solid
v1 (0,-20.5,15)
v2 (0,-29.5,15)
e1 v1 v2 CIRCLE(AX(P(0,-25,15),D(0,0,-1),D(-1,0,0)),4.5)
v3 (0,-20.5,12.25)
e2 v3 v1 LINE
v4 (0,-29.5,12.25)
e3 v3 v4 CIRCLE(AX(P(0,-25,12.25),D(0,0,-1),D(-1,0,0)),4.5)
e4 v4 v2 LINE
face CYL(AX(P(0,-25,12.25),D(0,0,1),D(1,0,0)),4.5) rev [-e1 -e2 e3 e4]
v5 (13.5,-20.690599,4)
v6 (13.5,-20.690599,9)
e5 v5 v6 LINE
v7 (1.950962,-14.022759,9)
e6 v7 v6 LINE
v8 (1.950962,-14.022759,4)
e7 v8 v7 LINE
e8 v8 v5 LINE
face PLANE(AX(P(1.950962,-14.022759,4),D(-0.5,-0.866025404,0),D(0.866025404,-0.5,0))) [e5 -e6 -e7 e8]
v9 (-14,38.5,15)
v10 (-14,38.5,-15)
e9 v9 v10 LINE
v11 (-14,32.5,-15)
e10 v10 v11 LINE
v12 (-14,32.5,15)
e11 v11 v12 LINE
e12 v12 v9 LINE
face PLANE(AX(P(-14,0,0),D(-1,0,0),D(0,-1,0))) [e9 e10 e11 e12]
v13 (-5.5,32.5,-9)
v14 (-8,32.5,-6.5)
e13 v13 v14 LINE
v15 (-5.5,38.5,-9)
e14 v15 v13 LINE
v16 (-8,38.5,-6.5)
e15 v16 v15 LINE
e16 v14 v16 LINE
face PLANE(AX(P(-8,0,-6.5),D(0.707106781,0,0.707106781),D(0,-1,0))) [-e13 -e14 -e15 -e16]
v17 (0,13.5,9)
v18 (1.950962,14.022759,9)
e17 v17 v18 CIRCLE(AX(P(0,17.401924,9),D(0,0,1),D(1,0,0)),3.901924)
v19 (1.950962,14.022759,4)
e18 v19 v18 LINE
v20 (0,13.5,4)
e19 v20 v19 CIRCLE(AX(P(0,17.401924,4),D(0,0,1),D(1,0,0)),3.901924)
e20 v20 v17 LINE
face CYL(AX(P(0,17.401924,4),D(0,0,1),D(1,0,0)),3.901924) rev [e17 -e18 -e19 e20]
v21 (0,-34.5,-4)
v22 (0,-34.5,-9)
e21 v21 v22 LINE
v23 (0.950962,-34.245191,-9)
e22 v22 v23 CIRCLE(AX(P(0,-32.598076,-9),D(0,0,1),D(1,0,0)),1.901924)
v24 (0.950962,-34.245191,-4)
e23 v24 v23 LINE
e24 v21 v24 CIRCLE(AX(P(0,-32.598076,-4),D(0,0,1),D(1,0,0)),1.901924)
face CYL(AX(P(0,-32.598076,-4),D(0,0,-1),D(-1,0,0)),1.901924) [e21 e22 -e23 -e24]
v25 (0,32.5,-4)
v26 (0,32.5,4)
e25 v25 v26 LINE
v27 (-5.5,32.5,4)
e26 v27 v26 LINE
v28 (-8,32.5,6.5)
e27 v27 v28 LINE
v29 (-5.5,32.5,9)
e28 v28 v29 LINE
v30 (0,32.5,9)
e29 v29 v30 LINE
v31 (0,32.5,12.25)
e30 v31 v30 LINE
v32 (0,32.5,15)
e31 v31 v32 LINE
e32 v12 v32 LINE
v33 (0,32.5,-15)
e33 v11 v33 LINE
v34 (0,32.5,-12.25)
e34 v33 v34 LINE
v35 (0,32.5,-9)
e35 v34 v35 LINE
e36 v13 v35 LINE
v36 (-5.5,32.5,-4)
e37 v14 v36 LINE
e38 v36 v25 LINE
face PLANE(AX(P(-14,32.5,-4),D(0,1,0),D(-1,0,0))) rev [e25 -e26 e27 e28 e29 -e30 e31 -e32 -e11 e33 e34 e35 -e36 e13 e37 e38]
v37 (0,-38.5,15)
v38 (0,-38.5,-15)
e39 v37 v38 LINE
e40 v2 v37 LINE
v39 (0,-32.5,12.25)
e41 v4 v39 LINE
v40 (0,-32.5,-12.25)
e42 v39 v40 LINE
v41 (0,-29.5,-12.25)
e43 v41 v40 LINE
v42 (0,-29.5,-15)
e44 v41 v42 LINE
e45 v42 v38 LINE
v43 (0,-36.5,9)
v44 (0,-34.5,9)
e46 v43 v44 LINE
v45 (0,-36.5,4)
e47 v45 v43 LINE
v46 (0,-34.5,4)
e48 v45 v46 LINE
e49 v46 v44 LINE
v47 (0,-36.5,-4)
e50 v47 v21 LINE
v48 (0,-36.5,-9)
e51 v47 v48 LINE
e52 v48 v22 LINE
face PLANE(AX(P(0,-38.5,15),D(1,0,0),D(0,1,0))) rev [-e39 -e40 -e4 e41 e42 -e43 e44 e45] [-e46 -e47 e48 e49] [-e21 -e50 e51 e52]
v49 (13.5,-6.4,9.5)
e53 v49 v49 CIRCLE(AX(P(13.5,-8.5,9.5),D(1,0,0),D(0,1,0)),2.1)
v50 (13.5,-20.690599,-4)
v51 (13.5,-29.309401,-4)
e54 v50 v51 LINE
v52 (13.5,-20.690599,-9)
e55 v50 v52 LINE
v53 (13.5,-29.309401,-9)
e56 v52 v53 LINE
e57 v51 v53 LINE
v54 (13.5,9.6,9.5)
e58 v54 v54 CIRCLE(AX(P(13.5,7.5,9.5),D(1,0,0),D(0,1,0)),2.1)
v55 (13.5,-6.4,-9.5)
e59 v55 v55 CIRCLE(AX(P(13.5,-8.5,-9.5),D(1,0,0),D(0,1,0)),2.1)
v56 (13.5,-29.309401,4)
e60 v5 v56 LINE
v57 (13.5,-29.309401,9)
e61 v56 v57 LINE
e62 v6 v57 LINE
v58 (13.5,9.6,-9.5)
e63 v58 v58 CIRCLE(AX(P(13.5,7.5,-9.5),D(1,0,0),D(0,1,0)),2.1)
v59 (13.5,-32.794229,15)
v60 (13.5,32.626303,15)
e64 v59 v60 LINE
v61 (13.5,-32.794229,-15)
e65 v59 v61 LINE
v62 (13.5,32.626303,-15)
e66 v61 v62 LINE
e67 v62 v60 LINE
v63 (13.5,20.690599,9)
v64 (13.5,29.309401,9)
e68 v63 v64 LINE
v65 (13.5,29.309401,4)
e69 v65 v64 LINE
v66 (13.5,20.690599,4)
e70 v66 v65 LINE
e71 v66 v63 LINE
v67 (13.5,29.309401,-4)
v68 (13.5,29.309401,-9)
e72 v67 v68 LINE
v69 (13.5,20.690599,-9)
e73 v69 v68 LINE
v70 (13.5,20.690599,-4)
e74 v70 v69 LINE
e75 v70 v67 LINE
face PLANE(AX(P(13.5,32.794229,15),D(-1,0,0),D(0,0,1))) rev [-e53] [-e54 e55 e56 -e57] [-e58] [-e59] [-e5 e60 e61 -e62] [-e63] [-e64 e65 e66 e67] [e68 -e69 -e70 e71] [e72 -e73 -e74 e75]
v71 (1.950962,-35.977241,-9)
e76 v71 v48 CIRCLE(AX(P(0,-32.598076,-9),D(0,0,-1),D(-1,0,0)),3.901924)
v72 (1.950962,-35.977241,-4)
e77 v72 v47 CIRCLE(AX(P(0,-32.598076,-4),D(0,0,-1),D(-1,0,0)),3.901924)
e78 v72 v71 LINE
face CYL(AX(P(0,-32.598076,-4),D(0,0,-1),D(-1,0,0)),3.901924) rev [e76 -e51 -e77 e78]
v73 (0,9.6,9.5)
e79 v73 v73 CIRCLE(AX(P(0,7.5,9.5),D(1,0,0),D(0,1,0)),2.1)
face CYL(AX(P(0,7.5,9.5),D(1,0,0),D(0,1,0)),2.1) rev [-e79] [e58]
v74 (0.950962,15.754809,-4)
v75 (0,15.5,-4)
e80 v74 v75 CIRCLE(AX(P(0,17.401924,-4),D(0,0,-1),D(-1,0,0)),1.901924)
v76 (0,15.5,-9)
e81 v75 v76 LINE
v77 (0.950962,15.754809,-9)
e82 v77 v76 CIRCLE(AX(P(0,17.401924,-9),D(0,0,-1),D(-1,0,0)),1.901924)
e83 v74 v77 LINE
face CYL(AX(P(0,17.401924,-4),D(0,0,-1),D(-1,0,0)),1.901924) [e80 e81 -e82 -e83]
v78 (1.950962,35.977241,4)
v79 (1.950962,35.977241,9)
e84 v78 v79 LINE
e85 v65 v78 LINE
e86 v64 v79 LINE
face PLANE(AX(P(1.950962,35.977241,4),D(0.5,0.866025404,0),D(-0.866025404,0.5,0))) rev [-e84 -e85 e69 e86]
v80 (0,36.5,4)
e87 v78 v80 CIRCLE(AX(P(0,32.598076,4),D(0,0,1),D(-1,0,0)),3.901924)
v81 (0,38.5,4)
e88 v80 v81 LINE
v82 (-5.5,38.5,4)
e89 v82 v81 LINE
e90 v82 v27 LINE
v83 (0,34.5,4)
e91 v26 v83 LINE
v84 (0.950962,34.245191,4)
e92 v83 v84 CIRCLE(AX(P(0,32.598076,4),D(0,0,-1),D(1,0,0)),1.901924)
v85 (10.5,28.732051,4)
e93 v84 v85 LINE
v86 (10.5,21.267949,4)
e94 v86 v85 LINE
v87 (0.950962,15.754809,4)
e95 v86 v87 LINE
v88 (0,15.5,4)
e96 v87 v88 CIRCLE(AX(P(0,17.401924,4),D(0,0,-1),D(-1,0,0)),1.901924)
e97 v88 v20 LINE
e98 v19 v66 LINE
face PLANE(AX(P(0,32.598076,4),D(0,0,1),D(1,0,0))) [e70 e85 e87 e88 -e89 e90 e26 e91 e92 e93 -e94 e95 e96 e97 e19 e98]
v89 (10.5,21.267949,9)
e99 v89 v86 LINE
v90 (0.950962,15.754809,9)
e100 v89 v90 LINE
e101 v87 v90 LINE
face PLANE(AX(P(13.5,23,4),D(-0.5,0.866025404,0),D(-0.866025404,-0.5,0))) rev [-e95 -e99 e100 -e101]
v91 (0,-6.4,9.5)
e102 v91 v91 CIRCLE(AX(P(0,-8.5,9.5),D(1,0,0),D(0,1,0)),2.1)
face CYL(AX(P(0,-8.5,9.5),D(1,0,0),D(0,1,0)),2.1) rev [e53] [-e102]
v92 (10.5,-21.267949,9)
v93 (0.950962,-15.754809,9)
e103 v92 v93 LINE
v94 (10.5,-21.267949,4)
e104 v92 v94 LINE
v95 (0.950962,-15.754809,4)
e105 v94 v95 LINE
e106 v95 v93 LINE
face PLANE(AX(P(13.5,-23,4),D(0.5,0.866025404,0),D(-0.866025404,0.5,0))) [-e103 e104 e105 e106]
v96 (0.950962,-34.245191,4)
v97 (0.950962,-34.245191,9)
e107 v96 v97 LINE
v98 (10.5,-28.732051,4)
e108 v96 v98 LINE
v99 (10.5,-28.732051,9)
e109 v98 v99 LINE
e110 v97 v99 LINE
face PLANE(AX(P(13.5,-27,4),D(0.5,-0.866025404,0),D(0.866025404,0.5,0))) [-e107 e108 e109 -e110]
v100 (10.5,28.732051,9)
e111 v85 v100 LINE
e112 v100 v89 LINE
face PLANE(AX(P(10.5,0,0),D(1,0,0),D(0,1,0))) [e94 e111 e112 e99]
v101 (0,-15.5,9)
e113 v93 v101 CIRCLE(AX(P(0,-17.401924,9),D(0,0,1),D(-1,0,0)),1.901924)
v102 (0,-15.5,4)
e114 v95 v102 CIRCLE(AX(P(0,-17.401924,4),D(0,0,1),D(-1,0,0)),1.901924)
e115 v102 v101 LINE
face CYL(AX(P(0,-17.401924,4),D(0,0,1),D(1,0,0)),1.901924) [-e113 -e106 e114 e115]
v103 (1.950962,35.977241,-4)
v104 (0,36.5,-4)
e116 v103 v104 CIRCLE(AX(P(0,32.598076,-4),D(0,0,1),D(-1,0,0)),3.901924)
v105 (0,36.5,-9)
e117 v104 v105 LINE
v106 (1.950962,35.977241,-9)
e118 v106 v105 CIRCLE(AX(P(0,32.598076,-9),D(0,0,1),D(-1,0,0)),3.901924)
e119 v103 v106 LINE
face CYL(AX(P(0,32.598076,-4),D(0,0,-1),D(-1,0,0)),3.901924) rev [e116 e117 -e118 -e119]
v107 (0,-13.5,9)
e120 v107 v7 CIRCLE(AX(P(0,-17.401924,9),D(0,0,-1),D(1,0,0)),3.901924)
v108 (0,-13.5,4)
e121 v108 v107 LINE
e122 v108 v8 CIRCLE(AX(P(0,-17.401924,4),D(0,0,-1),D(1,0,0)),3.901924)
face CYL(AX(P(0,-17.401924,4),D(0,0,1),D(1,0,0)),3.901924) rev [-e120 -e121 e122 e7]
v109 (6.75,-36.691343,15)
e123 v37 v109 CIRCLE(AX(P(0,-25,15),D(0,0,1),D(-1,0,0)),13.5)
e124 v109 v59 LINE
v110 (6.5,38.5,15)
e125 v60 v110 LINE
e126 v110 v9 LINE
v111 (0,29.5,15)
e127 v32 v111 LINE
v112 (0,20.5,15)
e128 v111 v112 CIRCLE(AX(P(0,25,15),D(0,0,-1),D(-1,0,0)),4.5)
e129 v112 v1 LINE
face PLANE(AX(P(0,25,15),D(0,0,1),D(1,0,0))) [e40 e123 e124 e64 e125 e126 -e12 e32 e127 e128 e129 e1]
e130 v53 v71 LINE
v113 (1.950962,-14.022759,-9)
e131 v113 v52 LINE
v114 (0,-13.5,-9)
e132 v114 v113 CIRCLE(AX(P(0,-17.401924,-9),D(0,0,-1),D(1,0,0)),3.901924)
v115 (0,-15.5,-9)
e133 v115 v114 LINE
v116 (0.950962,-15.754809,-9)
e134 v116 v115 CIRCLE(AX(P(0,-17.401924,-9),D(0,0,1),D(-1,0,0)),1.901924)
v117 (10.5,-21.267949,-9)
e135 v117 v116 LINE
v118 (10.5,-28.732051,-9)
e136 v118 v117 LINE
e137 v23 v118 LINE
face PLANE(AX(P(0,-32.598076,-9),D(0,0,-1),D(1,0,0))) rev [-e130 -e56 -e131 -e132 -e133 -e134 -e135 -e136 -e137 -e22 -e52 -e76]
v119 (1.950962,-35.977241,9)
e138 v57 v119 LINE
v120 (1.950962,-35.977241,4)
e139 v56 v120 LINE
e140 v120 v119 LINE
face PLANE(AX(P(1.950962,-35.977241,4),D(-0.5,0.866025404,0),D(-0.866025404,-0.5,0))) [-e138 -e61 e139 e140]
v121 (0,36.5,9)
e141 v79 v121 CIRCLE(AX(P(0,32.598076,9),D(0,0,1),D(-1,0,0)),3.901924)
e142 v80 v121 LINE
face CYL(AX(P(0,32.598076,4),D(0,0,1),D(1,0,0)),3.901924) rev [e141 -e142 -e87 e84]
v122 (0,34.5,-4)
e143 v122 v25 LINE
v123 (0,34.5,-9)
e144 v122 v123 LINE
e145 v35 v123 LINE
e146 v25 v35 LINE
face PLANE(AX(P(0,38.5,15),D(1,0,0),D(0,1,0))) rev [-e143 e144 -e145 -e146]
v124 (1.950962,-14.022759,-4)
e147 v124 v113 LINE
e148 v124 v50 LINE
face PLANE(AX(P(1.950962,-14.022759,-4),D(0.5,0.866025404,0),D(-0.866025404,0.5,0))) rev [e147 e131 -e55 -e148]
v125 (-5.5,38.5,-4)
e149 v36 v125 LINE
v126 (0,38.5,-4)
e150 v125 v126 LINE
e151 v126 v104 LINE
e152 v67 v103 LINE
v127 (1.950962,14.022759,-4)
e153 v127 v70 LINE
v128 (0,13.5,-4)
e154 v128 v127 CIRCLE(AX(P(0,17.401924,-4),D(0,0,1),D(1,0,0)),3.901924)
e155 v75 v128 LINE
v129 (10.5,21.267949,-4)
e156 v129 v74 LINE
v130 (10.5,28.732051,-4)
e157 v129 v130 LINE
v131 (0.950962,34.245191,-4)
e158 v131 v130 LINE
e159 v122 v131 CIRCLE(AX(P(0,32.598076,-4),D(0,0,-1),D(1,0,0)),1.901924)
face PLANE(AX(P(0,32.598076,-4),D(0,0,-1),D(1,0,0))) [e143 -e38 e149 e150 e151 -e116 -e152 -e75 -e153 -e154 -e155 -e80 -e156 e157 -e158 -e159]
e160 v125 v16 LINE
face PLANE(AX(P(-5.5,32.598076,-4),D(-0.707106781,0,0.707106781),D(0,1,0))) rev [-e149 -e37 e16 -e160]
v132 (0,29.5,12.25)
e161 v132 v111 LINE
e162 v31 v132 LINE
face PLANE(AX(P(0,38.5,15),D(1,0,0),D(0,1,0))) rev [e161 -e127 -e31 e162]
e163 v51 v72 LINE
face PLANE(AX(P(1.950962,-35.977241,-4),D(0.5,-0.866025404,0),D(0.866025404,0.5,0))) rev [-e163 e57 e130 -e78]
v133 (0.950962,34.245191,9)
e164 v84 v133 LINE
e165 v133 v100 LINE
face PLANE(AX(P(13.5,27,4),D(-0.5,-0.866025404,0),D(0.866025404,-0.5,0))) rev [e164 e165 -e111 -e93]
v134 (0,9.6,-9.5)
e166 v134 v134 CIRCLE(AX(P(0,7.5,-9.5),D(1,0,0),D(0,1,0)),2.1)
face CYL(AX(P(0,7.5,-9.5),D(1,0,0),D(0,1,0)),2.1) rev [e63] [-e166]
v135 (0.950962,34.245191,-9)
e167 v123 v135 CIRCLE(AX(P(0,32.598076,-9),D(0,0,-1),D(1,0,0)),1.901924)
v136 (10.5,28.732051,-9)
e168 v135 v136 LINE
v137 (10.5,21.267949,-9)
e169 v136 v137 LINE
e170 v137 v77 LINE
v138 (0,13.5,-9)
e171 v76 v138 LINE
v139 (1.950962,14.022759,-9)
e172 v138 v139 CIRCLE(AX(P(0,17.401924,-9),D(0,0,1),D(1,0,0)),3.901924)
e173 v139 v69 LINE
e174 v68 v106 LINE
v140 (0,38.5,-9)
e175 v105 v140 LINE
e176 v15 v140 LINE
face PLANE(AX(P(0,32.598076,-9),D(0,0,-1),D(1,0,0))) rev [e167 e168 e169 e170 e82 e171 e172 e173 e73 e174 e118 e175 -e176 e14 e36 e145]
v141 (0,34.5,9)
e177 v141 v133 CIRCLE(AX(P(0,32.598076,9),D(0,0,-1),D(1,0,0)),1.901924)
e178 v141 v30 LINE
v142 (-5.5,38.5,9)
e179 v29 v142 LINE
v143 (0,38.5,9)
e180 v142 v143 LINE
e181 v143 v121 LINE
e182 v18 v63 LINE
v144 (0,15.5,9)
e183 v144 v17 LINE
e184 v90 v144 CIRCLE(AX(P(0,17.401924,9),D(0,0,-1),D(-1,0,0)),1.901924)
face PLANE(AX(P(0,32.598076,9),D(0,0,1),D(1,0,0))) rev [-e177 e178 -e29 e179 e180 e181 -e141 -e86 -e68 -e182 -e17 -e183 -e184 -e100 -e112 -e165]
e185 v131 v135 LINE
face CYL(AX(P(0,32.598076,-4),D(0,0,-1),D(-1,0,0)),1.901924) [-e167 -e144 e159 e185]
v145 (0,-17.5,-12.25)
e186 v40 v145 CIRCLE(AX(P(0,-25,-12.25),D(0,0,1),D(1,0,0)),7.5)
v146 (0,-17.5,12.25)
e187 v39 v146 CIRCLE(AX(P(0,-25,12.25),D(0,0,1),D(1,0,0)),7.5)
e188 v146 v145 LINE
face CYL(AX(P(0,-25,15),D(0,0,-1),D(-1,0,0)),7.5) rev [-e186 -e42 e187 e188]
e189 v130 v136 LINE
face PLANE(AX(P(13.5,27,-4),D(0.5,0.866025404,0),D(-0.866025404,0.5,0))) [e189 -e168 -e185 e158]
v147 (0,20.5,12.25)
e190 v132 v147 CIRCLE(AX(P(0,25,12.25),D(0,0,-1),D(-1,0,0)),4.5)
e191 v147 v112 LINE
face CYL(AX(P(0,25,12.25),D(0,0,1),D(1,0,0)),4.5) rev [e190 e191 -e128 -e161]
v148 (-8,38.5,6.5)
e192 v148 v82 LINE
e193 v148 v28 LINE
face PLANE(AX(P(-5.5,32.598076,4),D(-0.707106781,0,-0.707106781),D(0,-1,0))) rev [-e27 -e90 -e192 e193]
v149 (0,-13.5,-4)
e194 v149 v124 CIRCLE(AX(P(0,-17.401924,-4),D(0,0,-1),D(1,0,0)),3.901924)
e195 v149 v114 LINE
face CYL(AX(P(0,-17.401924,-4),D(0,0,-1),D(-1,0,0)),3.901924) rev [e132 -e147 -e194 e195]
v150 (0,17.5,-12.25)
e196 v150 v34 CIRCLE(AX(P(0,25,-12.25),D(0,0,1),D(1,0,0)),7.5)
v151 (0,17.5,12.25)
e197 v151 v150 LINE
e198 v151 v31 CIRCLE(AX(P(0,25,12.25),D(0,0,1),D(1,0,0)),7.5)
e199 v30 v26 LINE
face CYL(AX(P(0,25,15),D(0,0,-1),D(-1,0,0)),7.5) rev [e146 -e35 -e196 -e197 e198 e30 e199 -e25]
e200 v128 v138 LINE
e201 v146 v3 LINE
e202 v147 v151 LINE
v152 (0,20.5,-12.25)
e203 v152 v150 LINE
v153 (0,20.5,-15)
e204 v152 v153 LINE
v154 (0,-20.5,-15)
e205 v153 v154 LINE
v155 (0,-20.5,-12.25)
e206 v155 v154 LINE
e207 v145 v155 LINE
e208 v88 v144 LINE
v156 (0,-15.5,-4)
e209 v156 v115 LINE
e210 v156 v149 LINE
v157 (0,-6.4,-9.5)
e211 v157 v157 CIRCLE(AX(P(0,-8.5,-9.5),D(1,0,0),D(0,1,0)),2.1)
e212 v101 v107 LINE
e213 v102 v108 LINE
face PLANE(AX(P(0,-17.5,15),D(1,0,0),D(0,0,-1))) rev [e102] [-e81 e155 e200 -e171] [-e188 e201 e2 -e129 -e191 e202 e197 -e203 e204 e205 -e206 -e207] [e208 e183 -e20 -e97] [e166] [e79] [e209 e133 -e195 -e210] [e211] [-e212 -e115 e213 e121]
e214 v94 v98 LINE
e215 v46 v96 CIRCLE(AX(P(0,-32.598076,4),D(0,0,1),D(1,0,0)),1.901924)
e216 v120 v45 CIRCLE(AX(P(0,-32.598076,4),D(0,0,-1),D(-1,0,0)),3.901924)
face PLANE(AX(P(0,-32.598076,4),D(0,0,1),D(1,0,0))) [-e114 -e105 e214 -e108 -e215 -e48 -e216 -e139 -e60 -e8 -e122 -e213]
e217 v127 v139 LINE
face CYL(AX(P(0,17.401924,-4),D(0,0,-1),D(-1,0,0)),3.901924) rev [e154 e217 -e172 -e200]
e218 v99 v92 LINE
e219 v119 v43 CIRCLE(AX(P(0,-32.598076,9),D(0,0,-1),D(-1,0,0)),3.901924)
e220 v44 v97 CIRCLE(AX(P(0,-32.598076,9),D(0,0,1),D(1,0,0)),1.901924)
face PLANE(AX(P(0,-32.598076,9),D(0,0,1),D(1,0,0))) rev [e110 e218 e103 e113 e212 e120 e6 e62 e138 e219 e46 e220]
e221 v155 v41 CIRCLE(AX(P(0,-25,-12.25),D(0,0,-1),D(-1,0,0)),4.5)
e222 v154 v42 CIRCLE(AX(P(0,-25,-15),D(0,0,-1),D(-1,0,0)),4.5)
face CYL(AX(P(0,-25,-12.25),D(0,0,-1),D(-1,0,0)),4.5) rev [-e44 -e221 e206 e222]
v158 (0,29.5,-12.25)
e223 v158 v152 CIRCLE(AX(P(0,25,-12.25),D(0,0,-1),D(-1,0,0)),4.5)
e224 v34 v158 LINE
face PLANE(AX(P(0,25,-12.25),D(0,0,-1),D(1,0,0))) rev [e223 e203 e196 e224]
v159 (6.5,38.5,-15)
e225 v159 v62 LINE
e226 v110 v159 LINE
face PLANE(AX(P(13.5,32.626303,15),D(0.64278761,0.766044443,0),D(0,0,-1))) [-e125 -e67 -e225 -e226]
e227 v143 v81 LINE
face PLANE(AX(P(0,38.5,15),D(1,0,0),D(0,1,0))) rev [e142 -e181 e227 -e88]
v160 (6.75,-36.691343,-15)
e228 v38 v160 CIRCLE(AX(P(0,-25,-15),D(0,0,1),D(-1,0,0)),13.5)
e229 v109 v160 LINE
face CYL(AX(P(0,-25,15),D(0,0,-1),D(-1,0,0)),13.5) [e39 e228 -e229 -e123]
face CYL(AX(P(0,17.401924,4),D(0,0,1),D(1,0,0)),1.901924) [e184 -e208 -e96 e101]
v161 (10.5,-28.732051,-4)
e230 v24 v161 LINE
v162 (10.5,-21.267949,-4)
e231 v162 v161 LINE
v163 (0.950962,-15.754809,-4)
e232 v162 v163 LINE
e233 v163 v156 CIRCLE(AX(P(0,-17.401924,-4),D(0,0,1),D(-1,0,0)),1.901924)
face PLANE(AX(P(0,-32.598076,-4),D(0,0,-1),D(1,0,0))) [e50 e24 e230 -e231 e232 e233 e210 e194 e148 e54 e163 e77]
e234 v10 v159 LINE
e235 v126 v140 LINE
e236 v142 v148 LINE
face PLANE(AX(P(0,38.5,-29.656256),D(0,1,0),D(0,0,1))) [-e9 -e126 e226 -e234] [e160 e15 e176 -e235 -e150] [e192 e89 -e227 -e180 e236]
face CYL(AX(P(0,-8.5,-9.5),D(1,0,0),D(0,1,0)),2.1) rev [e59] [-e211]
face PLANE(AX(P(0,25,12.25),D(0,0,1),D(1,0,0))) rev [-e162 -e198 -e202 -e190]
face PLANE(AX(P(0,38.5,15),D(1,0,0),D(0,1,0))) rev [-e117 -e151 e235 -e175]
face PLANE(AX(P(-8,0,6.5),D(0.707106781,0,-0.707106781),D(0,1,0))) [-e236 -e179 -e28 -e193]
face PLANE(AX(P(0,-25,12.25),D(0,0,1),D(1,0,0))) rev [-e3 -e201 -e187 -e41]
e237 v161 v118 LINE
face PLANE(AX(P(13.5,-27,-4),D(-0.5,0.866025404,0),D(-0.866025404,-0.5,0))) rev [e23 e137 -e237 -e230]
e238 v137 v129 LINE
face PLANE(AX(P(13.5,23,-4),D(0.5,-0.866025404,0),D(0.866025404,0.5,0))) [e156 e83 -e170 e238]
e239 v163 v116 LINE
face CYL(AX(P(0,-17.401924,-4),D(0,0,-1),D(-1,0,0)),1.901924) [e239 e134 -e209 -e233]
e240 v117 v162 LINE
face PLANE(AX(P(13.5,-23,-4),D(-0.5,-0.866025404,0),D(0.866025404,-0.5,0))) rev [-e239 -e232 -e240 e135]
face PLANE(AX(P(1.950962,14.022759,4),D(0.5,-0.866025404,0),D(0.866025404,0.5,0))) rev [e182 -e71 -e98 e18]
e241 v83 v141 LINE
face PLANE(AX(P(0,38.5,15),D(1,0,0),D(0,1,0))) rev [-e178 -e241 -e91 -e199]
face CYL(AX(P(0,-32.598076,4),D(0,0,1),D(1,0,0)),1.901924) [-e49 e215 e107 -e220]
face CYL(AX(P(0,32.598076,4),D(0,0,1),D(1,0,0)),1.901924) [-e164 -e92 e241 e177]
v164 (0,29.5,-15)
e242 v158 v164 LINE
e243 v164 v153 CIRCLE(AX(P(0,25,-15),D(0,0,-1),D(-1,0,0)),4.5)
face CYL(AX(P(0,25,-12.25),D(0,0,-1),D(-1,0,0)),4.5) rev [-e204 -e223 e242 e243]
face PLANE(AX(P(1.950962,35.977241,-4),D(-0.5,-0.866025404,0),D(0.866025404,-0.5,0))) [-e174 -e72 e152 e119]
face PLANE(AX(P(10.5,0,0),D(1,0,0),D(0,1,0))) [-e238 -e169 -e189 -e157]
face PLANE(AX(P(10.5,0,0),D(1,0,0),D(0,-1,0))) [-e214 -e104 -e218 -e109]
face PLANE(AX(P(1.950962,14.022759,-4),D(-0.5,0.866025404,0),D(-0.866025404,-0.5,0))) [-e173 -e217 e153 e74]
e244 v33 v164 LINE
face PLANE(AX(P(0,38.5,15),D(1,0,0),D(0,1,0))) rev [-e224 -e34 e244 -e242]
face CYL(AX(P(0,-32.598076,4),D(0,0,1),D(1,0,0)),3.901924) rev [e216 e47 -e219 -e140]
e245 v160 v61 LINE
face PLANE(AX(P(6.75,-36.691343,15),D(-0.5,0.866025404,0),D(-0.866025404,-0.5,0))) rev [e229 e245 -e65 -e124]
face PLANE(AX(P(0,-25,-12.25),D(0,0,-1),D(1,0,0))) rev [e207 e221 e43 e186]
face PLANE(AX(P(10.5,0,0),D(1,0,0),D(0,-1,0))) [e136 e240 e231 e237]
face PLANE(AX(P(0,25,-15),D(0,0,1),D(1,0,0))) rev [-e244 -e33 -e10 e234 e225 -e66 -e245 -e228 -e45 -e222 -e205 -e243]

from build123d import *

# Parameters (mm, degrees)
BOSS_EXTRUDE1_DEPTH     = 15
BOSS_EXTRUDE2_DEPTH     = 2.75
CUT_EXTRUDE1_START      = -6
CUT_EXTRUDE1_DEPTH      = 5
SKETCH5_W               = 5
SKETCH5_H               = 8.618802154
CUT_EXTRUDE2_DEPTH      = 3
MIRROR5_START           = -6
MIRROR5_COPY_1_DEPTH    = 5
MIRROR5_COPY_2_SKETCH_W = 5
MIRROR5_COPY_2_SKETCH_H = 8.618802154
MIRROR5_COPY_2_DEPTH    = 3
SKETCH6_R               = 2.1
CUT_EXTRUDE3_DEPTH      = 44.468379312
LPATTERN2_COUNT         = 2
LPATTERN2_PITCH         = 16
BOSS_EXTRUDE3_DEPTH     = 30
SKETCH9_W               = 8
SKETCH9_H               = 6
SKETCH9_W_2             = 6
BOSS_EXTRUDE4_DEPTH     = 14
SKETCH10_W              = 30
SKETCH10_H              = 6
BOSS_EXTRUDE5_DEPTH     = 6
CHAMFER1_SIZE           = 2.5
CHAMFER2_SIZE           = 7
CHAMFER2_SIZE2          = 5.873697418


with BuildPart() as part:
    # Sketch1 → Boss-Extrude1 (new, symmetric)
    with BuildSketch(Plane.XY):
        with BuildLine():
            Line((13.5, -25), (13.5, 25))
            Line((13.5, 25), (13.5, 32.794228634))
            Line((13.5, 32.794228634), (6.75, 36.691342951))
            ThreePointArc((6.75, 36.691342951), (3.494057109, 38.039998655), (0, 38.5))
            Line((0, 38.5), (0, 32.5))
            ThreePointArc((0, 32.5), (7.5, 25), (0, 17.5))
            Line((0, 17.5), (0, -17.5))
            ThreePointArc((0, -17.5), (7.5, -25), (0, -32.5))
            Line((0, -32.5), (0, -38.5))
            ThreePointArc((0, -38.5), (3.494057109, -38.039998655), (6.75, -36.691342951))
            Line((6.75, -36.691342951), (13.5, -32.794228634))
            Line((13.5, -32.794228634), (13.5, -25))
        make_face()
    extrude(amount=BOSS_EXTRUDE1_DEPTH, both=True)

    # Sketch2 → Boss-Extrude2 (add)
    with BuildSketch(Plane.XY.offset(15)):
        with BuildLine():
            Line((0, 32.5), (0, 29.5))
            ThreePointArc((0, 29.5), (4.5, 25), (0, 20.5))
            Line((0, 20.5), (0, 17.5))
            ThreePointArc((0, 17.5), (7.5, 25), (0, 32.5))
        make_face()
        with BuildLine():
            Line((0, -17.5), (0, -20.5))
            ThreePointArc((0, -20.5), (4.5, -25), (0, -29.5))
            Line((0, -29.5), (0, -32.5))
            ThreePointArc((0, -32.5), (7.5, -25), (0, -17.5))
        make_face()
    boss_extrude2 = extrude(amount=-BOSS_EXTRUDE2_DEPTH)

    # Mirror1: Boss-Extrude2 across plane
    add(boss_extrude2.mirror(Plane.XY))

    # Sketch3 → Cut-Extrude1 (cut)
    with BuildSketch(Plane.XY.offset(15).offset(CUT_EXTRUDE1_START)):
        with BuildLine():
            Line((0, 34.5), (0, 36.5))
            ThreePointArc((0, 36.5), (1.009892189, 36.367045171), (1.950961894, 35.977241336))
            Line((1.950961894, 35.977241336), (13.5, 29.309401077))
            Line((13.5, 29.309401077), (13.5, 27))
            Line((13.5, 27), (0.950961894, 34.245190528))
            ThreePointArc((0.950961894, 34.245190528), (0.492254099, 34.435193518), (0, 34.5))
        make_face()
        with BuildLine():
            Line((13.5, 23), (0.950961894, 15.754809472))
            ThreePointArc((0.950961894, 15.754809472), (0.492254099, 15.564806482), (0, 15.5))
            Line((0, 15.5), (0, 13.5))
            ThreePointArc((0, 13.5), (1.009892189, 13.632954829), (1.950961894, 14.022758664))
            Line((1.950961894, 14.022758664), (13.5, 20.690598923))
            Line((13.5, 20.690598923), (13.5, 23))
        make_face()
    cut_extrude1 = extrude(amount=-CUT_EXTRUDE1_DEPTH, mode=Mode.SUBTRACT)

    # Sketch5 → Cut-Extrude2 (cut)
    with BuildSketch(Plane(origin=(13.5, 0, 0), x_dir=(0, 0, -1), z_dir=(1, 0, 0))):
        with Locations((-6.5, 25)):
            Rectangle(SKETCH5_W, SKETCH5_H)
    cut_extrude2 = extrude(amount=-CUT_EXTRUDE2_DEPTH, mode=Mode.SUBTRACT)

    # Mirror3: Cut-Extrude1, Cut-Extrude2 across plane
    add(cut_extrude1.mirror(Plane.XY), mode=Mode.SUBTRACT)
    add(cut_extrude2.mirror(Plane.XY), mode=Mode.SUBTRACT)

    # Mirror5: Cut-Extrude1, Cut-Extrude2 across plane
    add(cut_extrude1.mirror(Plane.ZX), mode=Mode.SUBTRACT)
    add(cut_extrude2.mirror(Plane.ZX), mode=Mode.SUBTRACT)

    # Mirror5 copy 1 sketch → Mirror5 copy 1 (cut)
    with BuildSketch(Plane(origin=(0, 0, -15), x_dir=(1, 0, 0), z_dir=(0, 0, -1)).offset(MIRROR5_START)):
        with BuildLine():
            Line((0, 34.5), (0, 36.5))
            ThreePointArc((0, 36.5), (1.009892189, 36.367045171), (1.950961894, 35.977241336))
            Line((1.950961894, 35.977241336), (13.5, 29.309401077))
            Line((13.5, 29.309401077), (13.5, 27))
            Line((13.5, 27), (0.950961894, 34.245190528))
            ThreePointArc((0.950961894, 34.245190528), (0.492254099, 34.435193518), (0, 34.5))
        make_face()
        with BuildLine():
            Line((13.5, 23), (0.950961894, 15.754809472))
            ThreePointArc((0.950961894, 15.754809472), (0.492254099, 15.564806482), (0, 15.5))
            Line((0, 15.5), (0, 13.5))
            ThreePointArc((0, 13.5), (1.009892189, 13.632954829), (1.950961894, 14.022758664))
            Line((1.950961894, 14.022758664), (13.5, 20.690598923))
            Line((13.5, 20.690598923), (13.5, 23))
        make_face()
    extrude(amount=-MIRROR5_COPY_1_DEPTH, mode=Mode.SUBTRACT)

    # Mirror5 copy 2 sketch → Mirror5 copy 2 (cut)
    with BuildSketch(Plane(origin=(13.5, 0, 0), x_dir=(0, 0, 1), z_dir=(1, 0, 0))):
        with Locations((-6.5, 25)):
            Rectangle(MIRROR5_COPY_2_SKETCH_W, MIRROR5_COPY_2_SKETCH_H)
    extrude(amount=-MIRROR5_COPY_2_DEPTH, mode=Mode.SUBTRACT)

    # Sketch6 → Cut-Extrude3 (cut, through all)
    with BuildSketch(Plane(origin=(13.5, 0, 0), x_dir=(0, 0, -1), z_dir=(1, 0, 0))):
        with Locations(Location((-9.5, -8.5, 0), (0, 0, 90))):
            Circle(SKETCH6_R)
        with Locations(Location((9.5, -8.5, 0), (0, 0, 90))):
            Circle(SKETCH6_R)
    cut_extrude3 = extrude(amount=-CUT_EXTRUDE3_DEPTH, mode=Mode.SUBTRACT)

    # LPattern2: Cut-Extrude3 ×2
    with Locations(*[(0, i * LPATTERN2_PITCH, 0) for i in range(1, LPATTERN2_COUNT)]):
        add(cut_extrude3, mode=Mode.SUBTRACT)

    # Sketch8 → Boss-Extrude3 (add)
    with BuildSketch(Plane.XY.offset(15)):
        with BuildLine():
            Line((0, 38.5), (13.5, 38.5))
            Line((13.5, 38.5), (13.5, 32.794228634))
            Line((13.5, 32.794228634), (6.75, 36.691342951))
            ThreePointArc((6.75, 36.691342951), (3.494057109, 38.039998655), (0, 38.5))
        make_face()
    extrude(amount=-BOSS_EXTRUDE3_DEPTH)

    # Sketch9 → Boss-Extrude4 (add)
    with BuildSketch(Plane.ZY):
        with Locations((0, 35.5)):
            Rectangle(SKETCH9_W, SKETCH9_H)
        with Locations((12, 35.5)):
            Rectangle(SKETCH9_W_2, SKETCH9_H)
        with Locations((-12, 35.5)):
            Rectangle(SKETCH9_W_2, SKETCH9_H)
    extrude(amount=BOSS_EXTRUDE4_DEPTH)

    # Sketch10 → Boss-Extrude5 (add)
    with BuildSketch(Plane.ZY.offset(14)):
        with Locations((0, 35.5)):
            Rectangle(SKETCH10_W, SKETCH10_H)
    extrude(amount=-BOSS_EXTRUDE5_DEPTH)

    # Chamfer1
    chamfer1_edges = [part.edges().sort_by_distance(p)[0] for p in [
        (-8, 35.5, 4),
        (-8, 35.5, 9),
        (-8, 35.5, -4),
        (-8, 35.5, -9),
    ]]
    chamfer(chamfer1_edges, length=CHAMFER1_SIZE - 0.0001)  # a hair under: the kernel refuses the full size

    # Chamfer2
    chamfer2_edges = [part.edges().sort_by_distance(p)[0] for p in [
        (13.5, 38.5, 0),
    ]]
    chamfer2_side = [part.faces().sort_by_distance(p)[0] for p in [
        (0.031912143, 38.5, 0),
    ]]
    chamfer(chamfer2_edges, length=CHAMFER2_SIZE, length2=CHAMFER2_SIZE2, reference=chamfer2_side[0])


solid = part.part
